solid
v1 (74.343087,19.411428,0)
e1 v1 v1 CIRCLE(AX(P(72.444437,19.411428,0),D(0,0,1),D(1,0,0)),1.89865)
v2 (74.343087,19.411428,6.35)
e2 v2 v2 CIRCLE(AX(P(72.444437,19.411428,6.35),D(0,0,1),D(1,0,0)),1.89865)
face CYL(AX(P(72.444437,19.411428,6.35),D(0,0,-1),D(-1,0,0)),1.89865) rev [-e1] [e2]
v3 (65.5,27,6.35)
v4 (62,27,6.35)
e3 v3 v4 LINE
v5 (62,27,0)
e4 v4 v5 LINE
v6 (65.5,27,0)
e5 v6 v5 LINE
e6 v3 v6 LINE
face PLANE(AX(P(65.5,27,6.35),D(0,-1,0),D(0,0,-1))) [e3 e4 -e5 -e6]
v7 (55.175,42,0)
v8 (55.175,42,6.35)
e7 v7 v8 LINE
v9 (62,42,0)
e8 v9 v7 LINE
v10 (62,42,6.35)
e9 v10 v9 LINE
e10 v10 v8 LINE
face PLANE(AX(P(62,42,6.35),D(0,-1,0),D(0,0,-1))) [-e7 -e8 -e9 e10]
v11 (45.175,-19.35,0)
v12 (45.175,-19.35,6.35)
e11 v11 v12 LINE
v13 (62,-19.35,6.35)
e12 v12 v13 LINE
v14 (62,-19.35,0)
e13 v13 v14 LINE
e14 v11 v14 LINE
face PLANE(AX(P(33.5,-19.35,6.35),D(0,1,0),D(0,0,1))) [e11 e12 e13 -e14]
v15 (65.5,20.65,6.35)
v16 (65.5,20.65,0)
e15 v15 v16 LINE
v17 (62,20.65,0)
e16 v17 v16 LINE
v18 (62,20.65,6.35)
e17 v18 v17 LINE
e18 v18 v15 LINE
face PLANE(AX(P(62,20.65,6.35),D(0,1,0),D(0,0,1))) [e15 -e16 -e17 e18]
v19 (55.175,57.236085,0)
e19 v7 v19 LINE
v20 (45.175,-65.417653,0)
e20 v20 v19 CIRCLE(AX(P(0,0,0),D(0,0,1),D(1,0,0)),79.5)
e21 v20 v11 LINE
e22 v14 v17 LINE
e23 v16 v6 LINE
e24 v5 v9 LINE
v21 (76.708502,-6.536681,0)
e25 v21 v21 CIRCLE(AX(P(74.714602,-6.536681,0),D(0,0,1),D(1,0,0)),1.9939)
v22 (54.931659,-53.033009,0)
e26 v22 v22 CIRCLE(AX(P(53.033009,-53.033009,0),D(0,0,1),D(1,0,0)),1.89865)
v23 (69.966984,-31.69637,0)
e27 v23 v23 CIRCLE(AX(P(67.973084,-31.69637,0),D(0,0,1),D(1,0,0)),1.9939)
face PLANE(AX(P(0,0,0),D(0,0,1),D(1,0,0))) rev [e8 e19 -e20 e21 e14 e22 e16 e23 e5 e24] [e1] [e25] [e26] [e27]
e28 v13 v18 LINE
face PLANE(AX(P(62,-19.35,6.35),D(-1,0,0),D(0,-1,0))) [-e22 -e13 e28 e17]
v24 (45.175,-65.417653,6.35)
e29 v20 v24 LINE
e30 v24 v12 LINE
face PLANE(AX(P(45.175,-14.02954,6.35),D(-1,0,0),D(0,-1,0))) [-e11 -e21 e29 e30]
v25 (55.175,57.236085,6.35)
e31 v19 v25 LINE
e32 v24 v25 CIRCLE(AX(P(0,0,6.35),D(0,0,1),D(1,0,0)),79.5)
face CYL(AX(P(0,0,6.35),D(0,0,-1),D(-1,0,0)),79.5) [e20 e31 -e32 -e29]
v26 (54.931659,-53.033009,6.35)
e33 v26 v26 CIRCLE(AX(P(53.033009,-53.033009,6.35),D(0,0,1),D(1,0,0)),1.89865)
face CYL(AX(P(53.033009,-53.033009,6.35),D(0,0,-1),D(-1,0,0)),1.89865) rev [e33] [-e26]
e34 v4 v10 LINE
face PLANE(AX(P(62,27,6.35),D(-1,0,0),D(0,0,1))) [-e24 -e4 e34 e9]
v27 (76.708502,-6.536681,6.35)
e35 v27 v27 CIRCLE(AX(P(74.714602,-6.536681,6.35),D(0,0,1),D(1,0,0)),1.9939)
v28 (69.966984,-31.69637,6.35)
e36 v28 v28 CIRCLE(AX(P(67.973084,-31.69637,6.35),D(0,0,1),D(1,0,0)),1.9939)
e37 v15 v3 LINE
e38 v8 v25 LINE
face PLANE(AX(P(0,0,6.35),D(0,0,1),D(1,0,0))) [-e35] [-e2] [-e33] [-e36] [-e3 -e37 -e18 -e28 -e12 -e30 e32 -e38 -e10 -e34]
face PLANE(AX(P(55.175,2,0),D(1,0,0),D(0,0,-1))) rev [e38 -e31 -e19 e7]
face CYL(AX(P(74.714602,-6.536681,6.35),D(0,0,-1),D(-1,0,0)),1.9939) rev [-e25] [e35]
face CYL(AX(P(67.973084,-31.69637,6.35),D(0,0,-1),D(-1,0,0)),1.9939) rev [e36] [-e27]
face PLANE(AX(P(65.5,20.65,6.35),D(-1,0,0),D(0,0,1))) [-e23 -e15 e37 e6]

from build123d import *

# Parameters (mm, degrees)
SKETCH1_R              = 79.5
SKETCH1_R_2            = 1.9939
SKETCH1_R_3            = 1.89865
SKETCH1_R_4            = 8
BOSS_EXTRUDE1_DEPTH    = 6.35
SKETCH5_W              = 15.2
SKETCH5_H              = 16.075
CUT_EXTRUDE4_DEPTH     = 113.609158153
SKETCH6_R              = 1
CUT_EXTRUDE5_DEPTH     = 113.609158153
FILLET1_R              = 1
SKETCH10_W             = 53.523609979
SKETCH10_H             = 37.243469735
SKETCH10_W_2           = 54.285324016
SKETCH10_H_2           = 37.23416744
BOSS_EXTRUDE2_DEPTH    = 6.35
SKETCH11_W             = 15.2
SKETCH11_H             = 6.55
CUT_EXTRUDE8_DEPTH     = 113.609158153
SKETCH13_R             = 1
CUT_EXTRUDE9_DEPTH     = 113.609158153
FILLET2_R              = 1
LPATTERN3_COUNT        = 2
LPATTERN3_PITCH        = 30
FILLET2_OF_LPATTERN3_R = 1
MIRROR3_DEPTH          = 6.35
CUT_EXTRUDE11_DEPTH    = 113.609158153
SKETCH15_W             = 6.35
SKETCH15_H             = 80
CUT_EXTRUDE12_DEPTH    = 113.609158153
CUT_EXTRUDE14_DEPTH    = 113.609158153
CUT_EXTRUDE18_DEPTH    = 104.150578646


# Read off the part's stored shape, not the designer's step: Mirror3
with BuildPart() as part:
    # Sketch1 → Boss-Extrude1 (new body)
    with BuildSketch(Plane.XY):
        Circle(SKETCH1_R)
        with Locations((74.714602357, -6.536680706)):
            Circle(SKETCH1_R_2, mode=Mode.SUBTRACT)
        with Locations((72.444436972, 19.411428383)):
            Circle(SKETCH1_R_3, mode=Mode.SUBTRACT)
        Circle(SKETCH1_R_4, mode=Mode.SUBTRACT)
        with Locations((67.973084028, -31.696369631)):
            Circle(SKETCH1_R_2, mode=Mode.SUBTRACT)
        with Locations((10.606601718, -10.606601718)):
            Circle(SKETCH1_R_2, mode=Mode.SUBTRACT)
        with Locations((0, -75)):
            Circle(SKETCH1_R_3, mode=Mode.SUBTRACT)
        with Locations((-10.606601718, -10.606601718)):
            Circle(SKETCH1_R_2, mode=Mode.SUBTRACT)
        with Locations((-10.606601718, 10.606601718)):
            Circle(SKETCH1_R_2, mode=Mode.SUBTRACT)
        with Locations((10.606601718, 10.606601718)):
            Circle(SKETCH1_R_2, mode=Mode.SUBTRACT)
        with Locations((-53.033008589, -53.033008589)):
            Circle(SKETCH1_R_3, mode=Mode.SUBTRACT)
        with Locations((-75, 0)):
            Circle(SKETCH1_R_3, mode=Mode.SUBTRACT)
        with Locations((-53.033008589, 53.033008589)):
            Circle(SKETCH1_R_3, mode=Mode.SUBTRACT)
        with Locations((0, 75)):
            Circle(SKETCH1_R_3, mode=Mode.SUBTRACT)
        with Locations((53.033008589, -53.033008589)):
            Circle(SKETCH1_R_3, mode=Mode.SUBTRACT)
    extrude(amount=BOSS_EXTRUDE1_DEPTH)

    # Sketch5 → Cut-Extrude4 (cut, through all)
    with BuildSketch(Plane.XY.offset(6.35)):
        with Locations((-30, -37.9375)):
            Rectangle(SKETCH5_W, SKETCH5_H)
        with Locations((-30, 37.9375)):
            Rectangle(SKETCH5_W, SKETCH5_H)
        with Locations((30, 37.9375)):
            Rectangle(SKETCH5_W, SKETCH5_H)
        with Locations((0, -37.9375)):
            Rectangle(SKETCH5_W, SKETCH5_H)
        with Locations((30, -37.9375)):
            Rectangle(SKETCH5_W, SKETCH5_H)
        with Locations((0, 37.9375)):
            Rectangle(SKETCH5_W, SKETCH5_H)
    extrude(amount=-CUT_EXTRUDE4_DEPTH, mode=Mode.SUBTRACT)

    # Sketch6 → Cut-Extrude5 (cut, through all)
    with BuildSketch(Plane.XY.offset(6.35)):
        with Locations((-37.6, 45.975)):
            Circle(SKETCH6_R)
        with Locations((-22.4, 45.975)):
            Circle(SKETCH6_R)
        with Locations((-37.6, 29.9)):
            Circle(SKETCH6_R)
        with Locations((-22.4, 29.9)):
            Circle(SKETCH6_R)
        with Locations((-7.6, 45.975)):
            Circle(SKETCH6_R)
        with Locations((7.6, 45.975)):
            Circle(SKETCH6_R)
        with Locations((-7.6, 29.9)):
            Circle(SKETCH6_R)
        with Locations((7.6, 29.9)):
            Circle(SKETCH6_R)
        with Locations((22.4, 45.975)):
            Circle(SKETCH6_R)
        with Locations((37.6, 45.975)):
            Circle(SKETCH6_R)
        with Locations((22.4, 29.9)):
            Circle(SKETCH6_R)
        with Locations((37.6, 29.9)):
            Circle(SKETCH6_R)
        with Locations((-37.6, -29.9)):
            Circle(SKETCH6_R)
        with Locations((-22.4, -29.9)):
            Circle(SKETCH6_R)
        with Locations((-37.6, -45.975)):
            Circle(SKETCH6_R)
        with Locations((-22.4, -45.975)):
            Circle(SKETCH6_R)
        with Locations((-7.6, -29.9)):
            Circle(SKETCH6_R)
        with Locations((7.6, -29.9)):
            Circle(SKETCH6_R)
        with Locations((-7.6, -45.975)):
            Circle(SKETCH6_R)
        with Locations((7.6, -45.975)):
            Circle(SKETCH6_R)
        with Locations((22.4, -29.9)):
            Circle(SKETCH6_R)
        with Locations((37.6, -29.9)):
            Circle(SKETCH6_R)
        with Locations((22.4, -45.975)):
            Circle(SKETCH6_R)
        with Locations((37.6, -45.975)):
            Circle(SKETCH6_R)
    extrude(amount=-CUT_EXTRUDE5_DEPTH, mode=Mode.SUBTRACT)

    # Fillet1
    fillet1_edges = [part.edges().sort_by_distance(p)[0] for p in [
        (-37.6, 44.975, 3.175),
        (-36.6, 45.975, 3.175),
        (-22.4, 44.975, 3.175),
        (-23.4, 45.975, 3.175),
        (-37.6, 30.9, 3.175),
        (-36.6, 29.9, 3.175),
        (-23.4, 29.9, 3.175),
        (-22.4, 30.9, 3.175),
        (-7.6, 44.975, 3.175),
        (-6.6, 45.975, 3.175),
        (7.6, 44.975, 3.175),
        (6.6, 45.975, 3.175),
        (-7.6, 30.9, 3.175),
        (-6.6, 29.9, 3.175),
        (6.6, 29.9, 3.175),
        (7.6, 30.9, 3.175),
        (22.4, 44.975, 3.175),
        (23.4, 45.975, 3.175),
        (37.6, 44.975, 3.175),
        (36.6, 45.975, 3.175),
        (22.4, 30.9, 3.175),
        (23.4, 29.9, 3.175),
        (36.6, 29.9, 3.175),
        (37.6, 30.9, 3.175),
        (-36.6, -29.9, 3.175),
        (-37.6, -30.9, 3.175),
        (-22.4, -30.9, 3.175),
        (-23.4, -29.9, 3.175),
        (-36.6, -45.975, 3.175),
        (-37.6, -44.975, 3.175),
        (-23.4, -45.975, 3.175),
        (-22.4, -44.975, 3.175),
        (-6.6, -29.9, 3.175),
        (-7.6, -30.9, 3.175),
        (7.6, -30.9, 3.175),
        (6.6, -29.9, 3.175),
        (-6.6, -45.975, 3.175),
        (-7.6, -44.975, 3.175),
        (6.6, -45.975, 3.175),
        (7.6, -44.975, 3.175),
        (23.4, -29.9, 3.175),
        (22.4, -30.9, 3.175),
        (37.6, -30.9, 3.175),
        (36.6, -29.9, 3.175),
        (23.4, -45.975, 3.175),
        (22.4, -44.975, 3.175),
        (36.6, -45.975, 3.175),
        (37.6, -44.975, 3.175),
    ]]
    fillet(fillet1_edges, radius=FILLET1_R)

    # Sketch10 → Boss-Extrude2 (add, through all)
    with BuildSketch(Plane(origin=(0, 0, 0), x_dir=(-1, 0, 0), z_dir=(0, 0, -1))):
        with Locations((-13.786008458, 43.712822415)):
            Rectangle(SKETCH10_W, SKETCH10_H)
        with Locations((-15.177733449, -42.065637654)):
            Rectangle(SKETCH10_W_2, SKETCH10_H_2)
    extrude(amount=-BOSS_EXTRUDE2_DEPTH)

    # Sketch11 → Cut-Extrude8 (cut, through all)
    with BuildSketch(Plane(origin=(0, 0, 0), x_dir=(-1, 0, 0), z_dir=(0, 0, -1))):
        with Locations((0, 33.175)):
            Rectangle(SKETCH11_W, SKETCH11_H)
    cut_extrude8 = extrude(amount=-CUT_EXTRUDE8_DEPTH, mode=Mode.SUBTRACT)

    # Sketch13 → Cut-Extrude9 (cut, through all)
    with BuildSketch(Plane(origin=(0, 0, 0), x_dir=(-1, 0, 0), z_dir=(0, 0, -1))):
        with Locations((-7.6, 36.45)):
            Circle(SKETCH13_R)
        with Locations((-7.6, 29.9)):
            Circle(SKETCH13_R)
        with Locations((7.6, 29.9)):
            Circle(SKETCH13_R)
        with Locations((7.6, 36.45)):
            Circle(SKETCH13_R)
    cut_extrude9 = extrude(amount=-CUT_EXTRUDE9_DEPTH, mode=Mode.SUBTRACT)

    # Fillet2
    fillet2_edges = [part.edges().sort_by_distance(p)[0] for p in [
        (6.6, 36.45, 3.175),
        (7.6, 35.45, 3.175),
        (-6.6, 36.45, 3.175),
        (7.6, 30.9, 3.175),
        (-6.6, 29.9, 3.175),
        (6.6, 29.9, 3.175),
        (-7.6, 30.9, 3.175),
        (-7.6, 35.45, 3.175),
    ]]
    fillet(fillet2_edges, radius=FILLET2_R)

    # LPattern3: Cut-Extrude8, Cut-Extrude9 ×2
    with Locations(*[(i * LPATTERN3_PITCH, 0, 0) for i in range(1, LPATTERN3_COUNT)]):
        add(cut_extrude8, mode=Mode.SUBTRACT)
        add(cut_extrude9, mode=Mode.SUBTRACT)

    # Fillet2 of LPattern3
    fillet2_of_lpattern3_edges = [part.edges().sort_by_distance(p)[0] for p in [
        (36.6, 36.45, 3.175),
        (37.6, 35.45, 3.175),
        (23.4, 36.45, 3.175),
        (37.6, 30.9, 3.175),
        (23.4, 29.9, 3.175),
        (36.6, 29.9, 3.175),
        (22.4, 30.9, 3.175),
        (22.4, 35.45, 3.175),
    ]]
    fillet(fillet2_of_lpattern3_edges, radius=FILLET2_OF_LPATTERN3_R)

    # Mirror3 outline → Mirror3 (cut)
    with BuildSketch(Plane.XY):
        with BuildLine():
            Line((-5.867949192, -36.45), (5.867949192, -36.45))
            ThreePointArc((5.867949192, -36.45), (6.367949192, -36.583974596), (6.733974596, -36.95))
            ThreePointArc((6.733974596, -36.95), (8.307106781, -37.157106781), (8.1, -35.583974596))
            ThreePointArc((8.1, -35.583974596), (7.733974596, -35.217949192), (7.6, -34.717949192))
            Line((7.6, -34.717949192), (7.6, -31.632050808))
            ThreePointArc((7.6, -31.632050808), (7.733974596, -31.132050808), (8.1, -30.766025404))
            ThreePointArc((8.1, -30.766025404), (8.307106781, -29.192893219), (6.733974596, -29.4))
            ThreePointArc((6.733974596, -29.4), (6.367949192, -29.766025404), (5.867949192, -29.9))
            Line((5.867949192, -29.9), (-5.867949192, -29.9))
            ThreePointArc((-5.867949192, -29.9), (-6.367949192, -29.766025404), (-6.733974596, -29.4))
            ThreePointArc((-6.733974596, -29.4), (-8.307106781, -29.192893219), (-8.1, -30.766025404))
            ThreePointArc((-8.1, -30.766025404), (-7.733974596, -31.132050808), (-7.6, -31.632050808))
            Line((-7.6, -31.632050808), (-7.6, -34.717949192))
            ThreePointArc((-7.6, -34.717949192), (-7.733974596, -35.217949192), (-8.1, -35.583974596))
            ThreePointArc((-8.1, -35.583974596), (-8.307106781, -37.157106781), (-6.733974596, -36.95))
            ThreePointArc((-6.733974596, -36.95), (-6.367949192, -36.583974596), (-5.867949192, -36.45))
        make_face()
        with BuildLine():
            Line((24.132050808, -36.45), (35.867949192, -36.45))
            ThreePointArc((35.867949192, -36.45), (36.367949192, -36.583974596), (36.733974596, -36.95))
            ThreePointArc((36.733974596, -36.95), (38.307106781, -37.157106781), (38.1, -35.583974596))
            ThreePointArc((38.1, -35.583974596), (37.733974596, -35.217949192), (37.6, -34.717949192))
            Line((37.6, -34.717949192), (37.6, -31.632050808))
            ThreePointArc((37.6, -31.632050808), (37.733974596, -31.132050808), (38.1, -30.766025404))
            ThreePointArc((38.1, -30.766025404), (38.307106781, -29.192893219), (36.733974596, -29.4))
            ThreePointArc((36.733974596, -29.4), (36.367949192, -29.766025404), (35.867949192, -29.9))
            Line((35.867949192, -29.9), (24.132050808, -29.9))
            ThreePointArc((24.132050808, -29.9), (23.632050808, -29.766025404), (23.266025404, -29.4))
            ThreePointArc((23.266025404, -29.4), (21.692893219, -29.192893219), (21.9, -30.766025404))
            ThreePointArc((21.9, -30.766025404), (22.266025404, -31.132050808), (22.4, -31.632050808))
            Line((22.4, -31.632050808), (22.4, -34.717949192))
            ThreePointArc((22.4, -34.717949192), (22.266025404, -35.217949192), (21.9, -35.583974596))
            ThreePointArc((21.9, -35.583974596), (21.692893219, -37.157106781), (23.266025404, -36.95))
            ThreePointArc((23.266025404, -36.95), (23.632050808, -36.583974596), (24.132050808, -36.45))
        make_face()
    extrude(amount=MIRROR3_DEPTH, mode=Mode.SUBTRACT)

    # Sketch14 → Cut-Extrude11 (cut, through all)
    with BuildSketch(Plane.XY):
        Polygon((33.5, -19.35), (62, -19.35), (62, 20.65), (65.5, 20.65), (65.5, 27), (62, 27), (62, 42), (42, 42), (42, 27), (38.5, 27), (38.5, 20.65), (42, 20.65), (42, 15.65), (33.5, 15.65), align=None)
    extrude(amount=CUT_EXTRUDE11_DEPTH, mode=Mode.SUBTRACT)

    # Sketch15 → Cut-Extrude12 (cut, through all)
    with BuildSketch(Plane.XY.offset(6.35)):
        with Locations((52, 42)):
            Rectangle(SKETCH15_W, SKETCH15_H)
    extrude(amount=-CUT_EXTRUDE12_DEPTH, mode=Mode.SUBTRACT)

    # Sketch16 → Cut-Extrude14 (cut, through all)
    with BuildSketch(Plane.XY):
        with BuildLine():
            Line((42, -37.5), (42, -14.02059918))
            Line((42, -14.02059918), (45.175, -14.029540215))
            Line((45.175, -14.029540215), (45.175, -79.5))
            Line((45.175, -79.5), (0, -79.5))
            ThreePointArc((0, -79.5), (29.69848481, -67.19848481), (42, -37.5))
        make_face()
        with BuildLine():
            Line((0, 79.5), (45.175, 79.5))
            Line((45.175, 79.5), (45.175, 14.029540215))
            Line((45.175, 14.029540215), (42, 14.02059918))
            Line((42, 14.02059918), (42, 37.5))
            ThreePointArc((42, 37.5), (29.69848481, 67.19848481), (0, 79.5))
        make_face()
    extrude(amount=CUT_EXTRUDE14_DEPTH, mode=Mode.SUBTRACT)


with BuildPart() as cut_extrude14_piece_1:
    # of the separate pieces the step leaves, piece 1, a body of its own (cut_extrude14_pieces_kept)
    add(part.part.solids().sort_by_distance((45.175, -65.41765339, 6.35))[0])


with BuildPart() as cut_extrude14_piece_2:
    # of the separate pieces the step leaves, piece 2, a body of its own (cut_extrude14_pieces_kept)
    add(part.part.solids().sort_by_distance((48.825, 62.740492308, 6.35))[0])

    # Sketch24 → Cut-Extrude18 (cut, through all)
    with BuildSketch(Plane.XY.offset(6.35)):
        with BuildLine():
            Line((45.175, 65.41765339), (45.175, 42))
            Line((45.175, 42), (48.825, 42))
            Line((48.825, 42), (48.825, 62.740492308))
            ThreePointArc((48.825, 62.740492308), (47.019057816, 64.10505598), (45.175, 65.41765339))
        make_face()
    extrude(amount=-CUT_EXTRUDE18_DEPTH, mode=Mode.SUBTRACT)


solid = cut_extrude14_piece_1.part
